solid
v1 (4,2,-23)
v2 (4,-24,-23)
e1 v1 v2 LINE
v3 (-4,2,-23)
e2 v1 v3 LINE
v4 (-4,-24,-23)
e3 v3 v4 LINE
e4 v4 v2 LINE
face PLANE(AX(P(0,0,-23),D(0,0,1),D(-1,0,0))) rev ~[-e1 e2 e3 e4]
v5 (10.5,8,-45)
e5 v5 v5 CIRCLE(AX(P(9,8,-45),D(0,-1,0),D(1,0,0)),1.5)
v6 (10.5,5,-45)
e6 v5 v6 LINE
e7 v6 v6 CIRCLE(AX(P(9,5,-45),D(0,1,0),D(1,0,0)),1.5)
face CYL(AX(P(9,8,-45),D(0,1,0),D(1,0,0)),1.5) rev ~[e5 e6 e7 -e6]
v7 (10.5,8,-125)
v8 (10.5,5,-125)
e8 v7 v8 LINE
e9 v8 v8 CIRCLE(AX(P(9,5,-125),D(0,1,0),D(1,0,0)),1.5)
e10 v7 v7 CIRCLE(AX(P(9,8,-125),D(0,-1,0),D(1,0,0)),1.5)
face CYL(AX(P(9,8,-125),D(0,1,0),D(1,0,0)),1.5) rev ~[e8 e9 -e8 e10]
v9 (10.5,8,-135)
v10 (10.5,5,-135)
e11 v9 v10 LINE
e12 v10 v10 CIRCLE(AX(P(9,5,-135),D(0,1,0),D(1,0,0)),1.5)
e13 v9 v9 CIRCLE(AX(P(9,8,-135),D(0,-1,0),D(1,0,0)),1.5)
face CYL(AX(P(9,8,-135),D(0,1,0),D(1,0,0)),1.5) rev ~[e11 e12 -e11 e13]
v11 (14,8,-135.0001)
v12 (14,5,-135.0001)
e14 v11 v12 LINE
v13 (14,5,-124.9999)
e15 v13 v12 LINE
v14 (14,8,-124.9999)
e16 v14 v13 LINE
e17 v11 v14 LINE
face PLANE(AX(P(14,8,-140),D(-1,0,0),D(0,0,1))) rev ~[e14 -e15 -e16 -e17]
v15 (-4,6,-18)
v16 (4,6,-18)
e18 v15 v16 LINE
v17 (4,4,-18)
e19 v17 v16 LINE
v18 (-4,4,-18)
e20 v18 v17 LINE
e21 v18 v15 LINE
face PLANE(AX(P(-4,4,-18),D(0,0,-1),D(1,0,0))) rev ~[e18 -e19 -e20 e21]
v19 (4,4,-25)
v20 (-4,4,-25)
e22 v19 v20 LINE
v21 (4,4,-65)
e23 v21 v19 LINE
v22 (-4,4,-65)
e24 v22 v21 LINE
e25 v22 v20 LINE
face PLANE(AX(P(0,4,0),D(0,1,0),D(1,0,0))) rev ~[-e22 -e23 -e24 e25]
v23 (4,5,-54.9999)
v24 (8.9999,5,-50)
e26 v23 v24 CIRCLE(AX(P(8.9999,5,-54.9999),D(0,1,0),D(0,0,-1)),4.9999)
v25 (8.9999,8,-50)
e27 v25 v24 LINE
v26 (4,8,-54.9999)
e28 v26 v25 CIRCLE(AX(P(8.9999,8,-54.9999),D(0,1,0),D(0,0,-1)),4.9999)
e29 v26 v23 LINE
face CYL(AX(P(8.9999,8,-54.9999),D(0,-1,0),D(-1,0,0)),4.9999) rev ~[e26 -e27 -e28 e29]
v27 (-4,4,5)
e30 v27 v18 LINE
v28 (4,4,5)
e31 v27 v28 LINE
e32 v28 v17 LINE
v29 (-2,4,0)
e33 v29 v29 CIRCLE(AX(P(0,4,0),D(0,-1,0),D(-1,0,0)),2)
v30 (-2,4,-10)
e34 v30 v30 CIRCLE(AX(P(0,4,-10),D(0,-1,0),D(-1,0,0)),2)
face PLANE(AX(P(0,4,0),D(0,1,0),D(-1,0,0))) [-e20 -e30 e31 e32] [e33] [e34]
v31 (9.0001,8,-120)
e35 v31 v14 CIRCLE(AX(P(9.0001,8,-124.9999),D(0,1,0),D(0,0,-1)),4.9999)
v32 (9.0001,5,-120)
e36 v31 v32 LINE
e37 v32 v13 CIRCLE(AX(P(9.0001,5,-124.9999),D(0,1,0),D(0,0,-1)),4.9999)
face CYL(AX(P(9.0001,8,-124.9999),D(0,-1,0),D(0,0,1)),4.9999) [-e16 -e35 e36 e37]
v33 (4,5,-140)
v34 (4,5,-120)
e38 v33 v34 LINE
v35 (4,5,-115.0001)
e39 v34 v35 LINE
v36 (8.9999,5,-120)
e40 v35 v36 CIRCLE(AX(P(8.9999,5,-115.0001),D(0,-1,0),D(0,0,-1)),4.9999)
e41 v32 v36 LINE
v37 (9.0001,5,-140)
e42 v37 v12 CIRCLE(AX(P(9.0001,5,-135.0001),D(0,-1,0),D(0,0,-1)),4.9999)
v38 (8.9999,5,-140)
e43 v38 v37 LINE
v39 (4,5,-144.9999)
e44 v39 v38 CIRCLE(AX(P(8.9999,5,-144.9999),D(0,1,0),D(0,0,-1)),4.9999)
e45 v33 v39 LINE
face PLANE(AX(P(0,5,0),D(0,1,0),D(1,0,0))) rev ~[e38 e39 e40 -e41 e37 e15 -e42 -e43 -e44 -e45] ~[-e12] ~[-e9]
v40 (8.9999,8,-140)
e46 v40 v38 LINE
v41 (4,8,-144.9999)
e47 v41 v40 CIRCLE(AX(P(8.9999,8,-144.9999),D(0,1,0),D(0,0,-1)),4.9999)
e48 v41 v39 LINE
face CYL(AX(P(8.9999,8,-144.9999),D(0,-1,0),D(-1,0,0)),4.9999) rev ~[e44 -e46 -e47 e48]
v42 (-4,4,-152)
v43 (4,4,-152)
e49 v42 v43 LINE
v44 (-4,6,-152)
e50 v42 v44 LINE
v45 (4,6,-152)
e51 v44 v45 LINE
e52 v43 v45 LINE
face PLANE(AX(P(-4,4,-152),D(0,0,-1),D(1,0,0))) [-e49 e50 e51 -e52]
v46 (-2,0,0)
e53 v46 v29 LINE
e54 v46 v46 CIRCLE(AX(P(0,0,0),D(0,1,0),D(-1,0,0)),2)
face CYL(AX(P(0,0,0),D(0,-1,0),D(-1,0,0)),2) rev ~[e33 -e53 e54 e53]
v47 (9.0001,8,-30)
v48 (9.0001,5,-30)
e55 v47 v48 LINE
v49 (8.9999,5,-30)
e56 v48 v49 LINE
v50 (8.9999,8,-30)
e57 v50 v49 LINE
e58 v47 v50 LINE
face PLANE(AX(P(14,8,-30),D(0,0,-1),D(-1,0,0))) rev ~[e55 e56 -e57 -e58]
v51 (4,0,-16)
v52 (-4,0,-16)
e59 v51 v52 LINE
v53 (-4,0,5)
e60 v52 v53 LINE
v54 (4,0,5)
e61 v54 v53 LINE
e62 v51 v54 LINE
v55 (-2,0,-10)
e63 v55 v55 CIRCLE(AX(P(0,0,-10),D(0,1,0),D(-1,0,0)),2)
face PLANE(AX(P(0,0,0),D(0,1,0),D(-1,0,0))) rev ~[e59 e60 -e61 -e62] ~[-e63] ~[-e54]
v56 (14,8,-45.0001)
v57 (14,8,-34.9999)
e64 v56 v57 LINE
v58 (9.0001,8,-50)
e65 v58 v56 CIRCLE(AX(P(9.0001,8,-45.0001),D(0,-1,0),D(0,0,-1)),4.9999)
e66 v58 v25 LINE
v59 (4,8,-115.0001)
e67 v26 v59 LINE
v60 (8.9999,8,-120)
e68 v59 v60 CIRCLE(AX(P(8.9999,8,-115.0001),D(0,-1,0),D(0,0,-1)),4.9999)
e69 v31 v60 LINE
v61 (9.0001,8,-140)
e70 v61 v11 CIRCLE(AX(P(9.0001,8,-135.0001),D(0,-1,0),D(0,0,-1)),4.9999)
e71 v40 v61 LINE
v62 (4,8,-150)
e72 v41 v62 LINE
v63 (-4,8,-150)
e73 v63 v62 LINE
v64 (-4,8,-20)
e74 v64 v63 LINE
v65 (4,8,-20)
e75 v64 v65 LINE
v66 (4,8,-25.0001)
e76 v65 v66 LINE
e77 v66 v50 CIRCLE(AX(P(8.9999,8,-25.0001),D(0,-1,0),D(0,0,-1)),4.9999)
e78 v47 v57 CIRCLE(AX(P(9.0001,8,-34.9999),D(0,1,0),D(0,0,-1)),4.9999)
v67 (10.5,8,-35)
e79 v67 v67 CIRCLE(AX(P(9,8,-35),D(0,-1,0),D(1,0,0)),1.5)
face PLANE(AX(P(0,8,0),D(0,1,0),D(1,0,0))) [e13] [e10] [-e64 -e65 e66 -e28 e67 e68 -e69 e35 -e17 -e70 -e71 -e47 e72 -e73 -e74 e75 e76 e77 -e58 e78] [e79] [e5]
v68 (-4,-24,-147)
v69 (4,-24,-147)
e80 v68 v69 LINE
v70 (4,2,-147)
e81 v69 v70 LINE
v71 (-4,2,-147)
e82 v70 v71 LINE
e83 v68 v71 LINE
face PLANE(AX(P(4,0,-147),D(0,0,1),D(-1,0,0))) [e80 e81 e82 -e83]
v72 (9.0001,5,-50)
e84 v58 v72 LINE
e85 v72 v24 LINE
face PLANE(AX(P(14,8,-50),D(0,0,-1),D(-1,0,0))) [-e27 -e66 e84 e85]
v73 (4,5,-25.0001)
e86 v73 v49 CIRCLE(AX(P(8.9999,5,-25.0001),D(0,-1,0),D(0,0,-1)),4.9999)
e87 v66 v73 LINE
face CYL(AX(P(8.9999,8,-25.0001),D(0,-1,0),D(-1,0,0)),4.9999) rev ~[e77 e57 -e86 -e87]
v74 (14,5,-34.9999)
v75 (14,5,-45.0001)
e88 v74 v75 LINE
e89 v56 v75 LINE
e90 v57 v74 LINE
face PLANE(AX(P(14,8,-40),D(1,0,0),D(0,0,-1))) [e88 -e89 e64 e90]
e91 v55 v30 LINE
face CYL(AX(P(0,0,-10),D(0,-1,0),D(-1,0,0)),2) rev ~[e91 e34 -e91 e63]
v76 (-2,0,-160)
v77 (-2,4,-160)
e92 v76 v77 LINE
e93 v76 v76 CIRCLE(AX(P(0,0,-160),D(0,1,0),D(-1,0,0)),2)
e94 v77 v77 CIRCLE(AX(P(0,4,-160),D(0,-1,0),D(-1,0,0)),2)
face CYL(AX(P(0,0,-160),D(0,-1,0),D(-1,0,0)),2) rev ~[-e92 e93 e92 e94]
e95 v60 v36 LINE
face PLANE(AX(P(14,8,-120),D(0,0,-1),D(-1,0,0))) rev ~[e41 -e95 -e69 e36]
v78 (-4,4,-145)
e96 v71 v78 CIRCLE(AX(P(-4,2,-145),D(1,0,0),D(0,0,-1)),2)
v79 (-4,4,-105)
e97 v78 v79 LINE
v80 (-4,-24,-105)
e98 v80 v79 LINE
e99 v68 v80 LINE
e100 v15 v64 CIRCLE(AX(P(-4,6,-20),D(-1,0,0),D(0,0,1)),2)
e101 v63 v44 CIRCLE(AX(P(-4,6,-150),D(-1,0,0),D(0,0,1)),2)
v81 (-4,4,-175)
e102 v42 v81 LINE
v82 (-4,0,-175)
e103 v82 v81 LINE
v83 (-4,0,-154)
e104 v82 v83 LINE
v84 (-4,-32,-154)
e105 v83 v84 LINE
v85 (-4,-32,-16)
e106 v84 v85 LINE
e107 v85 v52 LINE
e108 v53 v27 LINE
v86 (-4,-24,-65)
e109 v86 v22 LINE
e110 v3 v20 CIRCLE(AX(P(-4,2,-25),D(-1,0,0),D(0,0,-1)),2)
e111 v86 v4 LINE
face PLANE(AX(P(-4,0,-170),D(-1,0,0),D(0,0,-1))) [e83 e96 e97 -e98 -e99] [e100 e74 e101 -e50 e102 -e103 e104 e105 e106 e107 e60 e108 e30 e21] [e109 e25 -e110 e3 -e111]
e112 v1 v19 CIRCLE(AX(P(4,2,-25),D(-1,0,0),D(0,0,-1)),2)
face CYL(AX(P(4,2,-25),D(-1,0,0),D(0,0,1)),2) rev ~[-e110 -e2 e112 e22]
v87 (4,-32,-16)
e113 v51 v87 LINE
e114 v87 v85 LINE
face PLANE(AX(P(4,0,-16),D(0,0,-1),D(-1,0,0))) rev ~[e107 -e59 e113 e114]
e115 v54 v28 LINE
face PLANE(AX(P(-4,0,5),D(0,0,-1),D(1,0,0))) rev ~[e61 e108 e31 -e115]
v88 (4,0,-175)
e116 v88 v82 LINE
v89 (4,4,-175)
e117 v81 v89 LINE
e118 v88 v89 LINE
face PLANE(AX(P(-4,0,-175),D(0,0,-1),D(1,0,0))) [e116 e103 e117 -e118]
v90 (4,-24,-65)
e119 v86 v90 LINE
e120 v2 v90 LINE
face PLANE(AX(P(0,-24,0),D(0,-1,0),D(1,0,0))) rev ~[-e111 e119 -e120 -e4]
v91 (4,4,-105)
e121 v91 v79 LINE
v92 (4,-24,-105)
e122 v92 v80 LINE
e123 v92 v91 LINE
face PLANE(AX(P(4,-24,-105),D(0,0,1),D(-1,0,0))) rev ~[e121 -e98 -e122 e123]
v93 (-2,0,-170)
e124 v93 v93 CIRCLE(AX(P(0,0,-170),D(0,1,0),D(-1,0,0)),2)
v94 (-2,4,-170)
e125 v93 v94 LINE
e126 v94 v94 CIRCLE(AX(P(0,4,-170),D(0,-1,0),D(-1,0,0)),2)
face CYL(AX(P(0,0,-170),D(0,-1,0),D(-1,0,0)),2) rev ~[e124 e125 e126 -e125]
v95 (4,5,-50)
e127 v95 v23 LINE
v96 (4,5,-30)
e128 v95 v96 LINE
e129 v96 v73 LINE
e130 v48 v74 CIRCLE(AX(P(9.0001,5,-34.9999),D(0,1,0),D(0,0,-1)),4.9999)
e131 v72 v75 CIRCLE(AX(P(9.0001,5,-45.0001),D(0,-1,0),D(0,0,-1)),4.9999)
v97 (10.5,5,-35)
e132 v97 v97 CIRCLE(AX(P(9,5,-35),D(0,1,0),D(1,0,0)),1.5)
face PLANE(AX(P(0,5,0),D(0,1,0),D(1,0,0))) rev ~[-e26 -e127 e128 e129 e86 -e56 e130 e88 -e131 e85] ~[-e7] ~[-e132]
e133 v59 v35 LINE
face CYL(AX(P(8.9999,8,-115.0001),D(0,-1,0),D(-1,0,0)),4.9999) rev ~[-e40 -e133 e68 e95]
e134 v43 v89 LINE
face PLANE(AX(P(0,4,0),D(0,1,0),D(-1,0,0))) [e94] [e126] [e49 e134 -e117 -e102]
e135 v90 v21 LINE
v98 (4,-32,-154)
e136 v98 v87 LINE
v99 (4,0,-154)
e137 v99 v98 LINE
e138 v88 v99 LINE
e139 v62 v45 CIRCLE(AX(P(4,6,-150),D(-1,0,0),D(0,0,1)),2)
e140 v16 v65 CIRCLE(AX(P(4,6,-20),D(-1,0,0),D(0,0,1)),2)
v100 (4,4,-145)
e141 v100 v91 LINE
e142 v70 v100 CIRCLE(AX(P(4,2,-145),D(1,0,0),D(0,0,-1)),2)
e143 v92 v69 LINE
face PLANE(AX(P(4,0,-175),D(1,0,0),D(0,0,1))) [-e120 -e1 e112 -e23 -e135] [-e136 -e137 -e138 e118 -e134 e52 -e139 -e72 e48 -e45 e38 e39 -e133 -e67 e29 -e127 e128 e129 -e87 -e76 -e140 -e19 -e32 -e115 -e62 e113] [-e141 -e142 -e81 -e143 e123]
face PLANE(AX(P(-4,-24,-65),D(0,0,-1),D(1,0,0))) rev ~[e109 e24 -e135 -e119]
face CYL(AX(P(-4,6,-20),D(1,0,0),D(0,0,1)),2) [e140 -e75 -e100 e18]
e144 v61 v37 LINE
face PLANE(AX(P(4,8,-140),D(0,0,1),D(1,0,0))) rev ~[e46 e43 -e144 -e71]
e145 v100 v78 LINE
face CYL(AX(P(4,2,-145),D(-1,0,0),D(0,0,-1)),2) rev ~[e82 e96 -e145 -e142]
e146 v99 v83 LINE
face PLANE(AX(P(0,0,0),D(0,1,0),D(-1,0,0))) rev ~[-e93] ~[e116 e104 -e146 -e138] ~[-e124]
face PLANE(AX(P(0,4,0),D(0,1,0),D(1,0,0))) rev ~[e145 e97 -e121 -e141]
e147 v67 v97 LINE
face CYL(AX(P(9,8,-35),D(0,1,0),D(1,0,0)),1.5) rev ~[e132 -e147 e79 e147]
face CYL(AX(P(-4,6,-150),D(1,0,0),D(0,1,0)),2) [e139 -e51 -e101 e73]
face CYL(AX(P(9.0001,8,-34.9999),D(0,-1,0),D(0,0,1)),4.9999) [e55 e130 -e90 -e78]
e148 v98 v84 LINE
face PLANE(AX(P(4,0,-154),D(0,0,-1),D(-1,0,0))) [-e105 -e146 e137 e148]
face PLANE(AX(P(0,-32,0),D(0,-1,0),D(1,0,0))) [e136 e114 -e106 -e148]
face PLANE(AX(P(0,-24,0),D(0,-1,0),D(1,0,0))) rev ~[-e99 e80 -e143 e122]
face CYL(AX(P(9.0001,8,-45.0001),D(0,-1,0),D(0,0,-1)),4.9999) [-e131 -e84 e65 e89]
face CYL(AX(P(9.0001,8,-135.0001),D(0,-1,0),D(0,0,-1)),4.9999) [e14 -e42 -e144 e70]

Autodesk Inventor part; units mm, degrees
ref_plane "YZ Plane" through (0, 0, 0) normal (1, 0, 0) x (0, 1, 0)
ref_plane "XZ Plane" through (0, 0, 0) normal (0, 1, 0) x (-1, 0, 0)
ref_plane "XY Plane" through (0, 0, 0) normal (0, 0, 1) x (1, 0, 0)
sketch "Sketch1" plane through (0, 0, 0) normal (0, 1, 0) x (-1, 0, 0)
  circle A0 centre (0, 0) radius 2
  line L0 (0, 0) -> (0, -10)
  circle A1 centre (0, -10) radius 2
  line L1 (0, 0) -> (4, 0)
  line L2 (4, 0) -> (4, 5)
  line L3 (4, 5) -> (0, 5)
  line L4 (0, 5) -> (0, 0)
  line L5 (0, -10) -> (-4, -10)
  line L6 (-4, -10) -> (-4, -15)
  line L7 (-4, -15) -> (0, -15)
  line L8 (0, -15) -> (0, -10)
  line L9 (4, 5) -> (-4, 5)
  line L10 (-4, 5) -> (-4, -15)
  line L11 (-4, -15) -> (4, -15)
  line L12 (4, -15) -> (4, 5)
  line L13 (4, -15) -> (-4, -15)
  line L14 (-4, -15) -> (-4, -23)
  line L15 (-4, -23) -> (4, -23)
  line L16 (4, -23) -> (4, -15)
  line L17 (0, -10) -> (0, -85)
  line L18 (0, -85) -> (10, -85)
  circle A2 centre (0, -170) radius 2
  line L19 (0, -170) -> (0, -160)
  circle A3 centre (0, -160) radius 2
  line L20 (0, -170) -> (4, -170)
  line L21 (4, -170) -> (4, -175)
  line L22 (4, -175) -> (0, -175)
  line L23 (0, -175) -> (0, -170)
  line L24 (0, -160) -> (-4, -160)
  line L25 (-4, -160) -> (-4, -155)
  line L26 (-4, -155) -> (0, -155)
  line L27 (0, -155) -> (0, -160)
  line L28 (4, -175) -> (-4, -175)
  line L29 (-4, -175) -> (-4, -155)
  line L30 (-4, -155) -> (4, -155)
  line L31 (4, -155) -> (4, -175)
  line L32 (4, -155) -> (-4, -155)
  line L33 (-4, -155) -> (-4, -147)
  line L34 (-4, -147) -> (4, -147)
  line L35 (4, -147) -> (4, -155)
  dimension "d0" = 4
  dimension "d1" = 10
  dimension "d2" = 4
  dimension "d3" = 4
  dimension "d4" = 5
  dimension "d5" = 4
  dimension "d6" = 5
  dimension "d7" = 8
  dimension "d8" = 75
  dimension "d9" = 10
extrude "Extrusion1" add sketch "Sketch1" along normal blind 4 contours L1 L12 L11 L8 A1 L0 A0 | A0 L4 L3 L2 L1 | A0 L0 A1 L5 L10 L9 L4 | L16 L15 L17 L11 | A1 L8 L7 L6 L5 | L17 L15 L14 L7 | L20 L21 L22 L23 A2 | A2 L19 A3 L27 L30 L31 L20 | A2 L23 L28 L29 L24 A3 L19 | L30 L26 L33 L34 L35 | L24 L25 L26 L27 A3
sketch "Sketch2" plane through (0, 0, 0) normal (0, -1, 0) x (1, 0, 0)
  line L0 (4, -23) -> (-4, -23) projected
  line L1 (4, 5) -> (4, -23) projected
  line L2 (-4, -23) -> (4, -23)
  line L3 (4, -23) -> (4, -16)
  line L4 (4, -16) -> (-4, -16)
  line L5 (-4, -16) -> (-4, -23)
  line L6 (-4, -147) -> (4, -147) projected
  line L7 (-4, -147) -> (4, -147)
  line L8 (4, -147) -> (4, -154)
  line L9 (4, -154) -> (-4, -154)
  line L10 (-4, -154) -> (-4, -147)
  point P0 (0, 0)
  dimension "d12" = 7
  dimension "d13" = 7
extrude "Extrusion2" add sketch "Sketch2" along normal blind 32
sketch "Sketch3" plane through (0, -32, 0) normal (0, -1, 0) x (1, 0, 0)
  line L0 (4, -154) -> (4, -147) projected
  line L1 (-4, -16) -> (-4, -23) projected
  line L2 (4, -154) -> (-4, -154)
  line L3 (-4, -154) -> (-4, -16)
  line L4 (-4, -16) -> (4, -16)
  line L5 (4, -16) -> (4, -154)
  point P0 (0, 0)
extrude "Extrusion3" add sketch "Sketch3" against normal blind 8
sketch "Sketch4" plane through (0, 4, 0) normal (0, 1, 0) x (1, 0, 0)
  line L0 (4, 23) -> (4, 147) projected
  line L1 (4, 147) -> (-4, 147)
  line L2 (-4, 147) -> (-4, 152)
  line L3 (-4, 152) -> (4, 152)
  line L4 (4, 152) -> (4, 147)
  line L5 (4, 23) -> (-4, 23) projected
  line L6 (4, 23) -> (-4, 23)
  line L7 (-4, 23) -> (-4, 18)
  line L8 (-4, 18) -> (4, 18)
  line L9 (4, 18) -> (4, 23)
  line L10 (-4, 18) -> (4, 18)
  line L11 (4, 18) -> (4, 152)
  line L12 (4, 152) -> (-4, 152)
  line L13 (-4, 152) -> (-4, 18)
  point P0 (0, 0)
  point P1 (-4, 23)
  dimension "d18" = 8
  dimension "d19" = 5
  dimension "d20" = 8
  dimension "d21" = 5
extrude "Extrusion4" add sketch "Sketch4" along normal blind 4
sketch "Sketch5" plane through (0, -24, 0) normal (0, 1, 0) x (1, 0, 0)
  line L0 (4, 23) -> (-4, 23) projected
  line L1 (4, 23) -> (4, 147) projected
  line L2 (4, 23) -> (4, 147)
  line L3 (4, 85) -> (0, 85)
  line L4 (-4, 65) -> (4, 65)
  line L5 (4, 65) -> (4, 105)
  line L6 (4, 105) -> (-4, 105)
  line L7 (-4, 105) -> (-4, 65)
  line L8 (-4, 65) -> (4, 105) construction
  line L9 (4, 65) -> (-4, 105) construction
  point P0 (0, 0)
  point P1 (4, 65)
  point P2 (4, 105)
  dimension "d24" = 40
extrude "Extrusion5" add sketch "Sketch5" along normal up to surface (28 mm away)
fillet "Fillet1" radius 2 4 edges at (0, 4, -23) (0, 8, -18) (0, 8, -152) (0, 4, -147)
sketch "Sketch6" plane through (4, 0, 5) normal (1, 0, 0) x (0, 0, -1)
  point P0 (5, 0)
sketch "Sketch7" plane through (0, 8, 0) normal (0, 1, 0) x (1, 0, 0)
  line L0 (-4, 150) -> (4, 150) projected
  line L1 (4, 150) -> (4, 130)
  line L2 (4, 154) -> (4, 16) projected
  line L3 (4, 20) -> (-4, 20) projected
  line L4 (4, 20) -> (4, 40)
  line L5 (4, 130) -> (14, 130)
  line L6 (14, 130) -> (14, 120)
  line L7 (14, 120) -> (4, 120)
  line L8 (4, 120) -> (4, 130)
  line L9 (14, 130) -> (4, 130)
  line L10 (4, 130) -> (4, 140)
  line L11 (4, 140) -> (14, 140)
  line L12 (14, 140) -> (14, 130)
  line L13 (4, 40) -> (14, 40)
  line L14 (14, 40) -> (14, 50)
  line L15 (14, 50) -> (4, 50)
  line L16 (4, 50) -> (4, 40)
  line L17 (4, 40) -> (14, 40)
  line L18 (14, 40) -> (14, 30)
  line L19 (14, 30) -> (4, 30)
  line L20 (4, 30) -> (4, 40)
  line L21 (9, 40) -> (9, 45)
  line L22 (9, 40) -> (9, 35)
  circle A0 centre (9, 45) radius 1.5
  circle A1 centre (9, 35) radius 1.5
  line L23 (9, 130) -> (9, 135)
  line L24 (9, 130) -> (9, 125)
  circle A2 centre (9, 135) radius 1.5
  circle A3 centre (9, 125) radius 1.5
  point P0 (0, 0)
  dimension "d28" = 20
  dimension "d29" = 20
  dimension "d30" = 10
  dimension "d31" = 10
  dimension "d32" = 10
  dimension "d33" = 10
  dimension "d34" = 10
  dimension "d35" = 3
  dimension "d36" = 3
  dimension "d37" = 5
  dimension "d38" = 3
  dimension "d39" = 3
extrude "Extrusion6" add sketch "Sketch7" against normal blind 3
fillet "Fillet2" radius 5 8 edges at (4, 6.5, -120) (14, 6.5, -120) (4, 6.5, -140) (14, 6.5, -140) (4, 6.5, -30) (14, 6.5, -30) (14, 6.5, -50) (4, 6.5, -50)
properties part number "side_wall2"
